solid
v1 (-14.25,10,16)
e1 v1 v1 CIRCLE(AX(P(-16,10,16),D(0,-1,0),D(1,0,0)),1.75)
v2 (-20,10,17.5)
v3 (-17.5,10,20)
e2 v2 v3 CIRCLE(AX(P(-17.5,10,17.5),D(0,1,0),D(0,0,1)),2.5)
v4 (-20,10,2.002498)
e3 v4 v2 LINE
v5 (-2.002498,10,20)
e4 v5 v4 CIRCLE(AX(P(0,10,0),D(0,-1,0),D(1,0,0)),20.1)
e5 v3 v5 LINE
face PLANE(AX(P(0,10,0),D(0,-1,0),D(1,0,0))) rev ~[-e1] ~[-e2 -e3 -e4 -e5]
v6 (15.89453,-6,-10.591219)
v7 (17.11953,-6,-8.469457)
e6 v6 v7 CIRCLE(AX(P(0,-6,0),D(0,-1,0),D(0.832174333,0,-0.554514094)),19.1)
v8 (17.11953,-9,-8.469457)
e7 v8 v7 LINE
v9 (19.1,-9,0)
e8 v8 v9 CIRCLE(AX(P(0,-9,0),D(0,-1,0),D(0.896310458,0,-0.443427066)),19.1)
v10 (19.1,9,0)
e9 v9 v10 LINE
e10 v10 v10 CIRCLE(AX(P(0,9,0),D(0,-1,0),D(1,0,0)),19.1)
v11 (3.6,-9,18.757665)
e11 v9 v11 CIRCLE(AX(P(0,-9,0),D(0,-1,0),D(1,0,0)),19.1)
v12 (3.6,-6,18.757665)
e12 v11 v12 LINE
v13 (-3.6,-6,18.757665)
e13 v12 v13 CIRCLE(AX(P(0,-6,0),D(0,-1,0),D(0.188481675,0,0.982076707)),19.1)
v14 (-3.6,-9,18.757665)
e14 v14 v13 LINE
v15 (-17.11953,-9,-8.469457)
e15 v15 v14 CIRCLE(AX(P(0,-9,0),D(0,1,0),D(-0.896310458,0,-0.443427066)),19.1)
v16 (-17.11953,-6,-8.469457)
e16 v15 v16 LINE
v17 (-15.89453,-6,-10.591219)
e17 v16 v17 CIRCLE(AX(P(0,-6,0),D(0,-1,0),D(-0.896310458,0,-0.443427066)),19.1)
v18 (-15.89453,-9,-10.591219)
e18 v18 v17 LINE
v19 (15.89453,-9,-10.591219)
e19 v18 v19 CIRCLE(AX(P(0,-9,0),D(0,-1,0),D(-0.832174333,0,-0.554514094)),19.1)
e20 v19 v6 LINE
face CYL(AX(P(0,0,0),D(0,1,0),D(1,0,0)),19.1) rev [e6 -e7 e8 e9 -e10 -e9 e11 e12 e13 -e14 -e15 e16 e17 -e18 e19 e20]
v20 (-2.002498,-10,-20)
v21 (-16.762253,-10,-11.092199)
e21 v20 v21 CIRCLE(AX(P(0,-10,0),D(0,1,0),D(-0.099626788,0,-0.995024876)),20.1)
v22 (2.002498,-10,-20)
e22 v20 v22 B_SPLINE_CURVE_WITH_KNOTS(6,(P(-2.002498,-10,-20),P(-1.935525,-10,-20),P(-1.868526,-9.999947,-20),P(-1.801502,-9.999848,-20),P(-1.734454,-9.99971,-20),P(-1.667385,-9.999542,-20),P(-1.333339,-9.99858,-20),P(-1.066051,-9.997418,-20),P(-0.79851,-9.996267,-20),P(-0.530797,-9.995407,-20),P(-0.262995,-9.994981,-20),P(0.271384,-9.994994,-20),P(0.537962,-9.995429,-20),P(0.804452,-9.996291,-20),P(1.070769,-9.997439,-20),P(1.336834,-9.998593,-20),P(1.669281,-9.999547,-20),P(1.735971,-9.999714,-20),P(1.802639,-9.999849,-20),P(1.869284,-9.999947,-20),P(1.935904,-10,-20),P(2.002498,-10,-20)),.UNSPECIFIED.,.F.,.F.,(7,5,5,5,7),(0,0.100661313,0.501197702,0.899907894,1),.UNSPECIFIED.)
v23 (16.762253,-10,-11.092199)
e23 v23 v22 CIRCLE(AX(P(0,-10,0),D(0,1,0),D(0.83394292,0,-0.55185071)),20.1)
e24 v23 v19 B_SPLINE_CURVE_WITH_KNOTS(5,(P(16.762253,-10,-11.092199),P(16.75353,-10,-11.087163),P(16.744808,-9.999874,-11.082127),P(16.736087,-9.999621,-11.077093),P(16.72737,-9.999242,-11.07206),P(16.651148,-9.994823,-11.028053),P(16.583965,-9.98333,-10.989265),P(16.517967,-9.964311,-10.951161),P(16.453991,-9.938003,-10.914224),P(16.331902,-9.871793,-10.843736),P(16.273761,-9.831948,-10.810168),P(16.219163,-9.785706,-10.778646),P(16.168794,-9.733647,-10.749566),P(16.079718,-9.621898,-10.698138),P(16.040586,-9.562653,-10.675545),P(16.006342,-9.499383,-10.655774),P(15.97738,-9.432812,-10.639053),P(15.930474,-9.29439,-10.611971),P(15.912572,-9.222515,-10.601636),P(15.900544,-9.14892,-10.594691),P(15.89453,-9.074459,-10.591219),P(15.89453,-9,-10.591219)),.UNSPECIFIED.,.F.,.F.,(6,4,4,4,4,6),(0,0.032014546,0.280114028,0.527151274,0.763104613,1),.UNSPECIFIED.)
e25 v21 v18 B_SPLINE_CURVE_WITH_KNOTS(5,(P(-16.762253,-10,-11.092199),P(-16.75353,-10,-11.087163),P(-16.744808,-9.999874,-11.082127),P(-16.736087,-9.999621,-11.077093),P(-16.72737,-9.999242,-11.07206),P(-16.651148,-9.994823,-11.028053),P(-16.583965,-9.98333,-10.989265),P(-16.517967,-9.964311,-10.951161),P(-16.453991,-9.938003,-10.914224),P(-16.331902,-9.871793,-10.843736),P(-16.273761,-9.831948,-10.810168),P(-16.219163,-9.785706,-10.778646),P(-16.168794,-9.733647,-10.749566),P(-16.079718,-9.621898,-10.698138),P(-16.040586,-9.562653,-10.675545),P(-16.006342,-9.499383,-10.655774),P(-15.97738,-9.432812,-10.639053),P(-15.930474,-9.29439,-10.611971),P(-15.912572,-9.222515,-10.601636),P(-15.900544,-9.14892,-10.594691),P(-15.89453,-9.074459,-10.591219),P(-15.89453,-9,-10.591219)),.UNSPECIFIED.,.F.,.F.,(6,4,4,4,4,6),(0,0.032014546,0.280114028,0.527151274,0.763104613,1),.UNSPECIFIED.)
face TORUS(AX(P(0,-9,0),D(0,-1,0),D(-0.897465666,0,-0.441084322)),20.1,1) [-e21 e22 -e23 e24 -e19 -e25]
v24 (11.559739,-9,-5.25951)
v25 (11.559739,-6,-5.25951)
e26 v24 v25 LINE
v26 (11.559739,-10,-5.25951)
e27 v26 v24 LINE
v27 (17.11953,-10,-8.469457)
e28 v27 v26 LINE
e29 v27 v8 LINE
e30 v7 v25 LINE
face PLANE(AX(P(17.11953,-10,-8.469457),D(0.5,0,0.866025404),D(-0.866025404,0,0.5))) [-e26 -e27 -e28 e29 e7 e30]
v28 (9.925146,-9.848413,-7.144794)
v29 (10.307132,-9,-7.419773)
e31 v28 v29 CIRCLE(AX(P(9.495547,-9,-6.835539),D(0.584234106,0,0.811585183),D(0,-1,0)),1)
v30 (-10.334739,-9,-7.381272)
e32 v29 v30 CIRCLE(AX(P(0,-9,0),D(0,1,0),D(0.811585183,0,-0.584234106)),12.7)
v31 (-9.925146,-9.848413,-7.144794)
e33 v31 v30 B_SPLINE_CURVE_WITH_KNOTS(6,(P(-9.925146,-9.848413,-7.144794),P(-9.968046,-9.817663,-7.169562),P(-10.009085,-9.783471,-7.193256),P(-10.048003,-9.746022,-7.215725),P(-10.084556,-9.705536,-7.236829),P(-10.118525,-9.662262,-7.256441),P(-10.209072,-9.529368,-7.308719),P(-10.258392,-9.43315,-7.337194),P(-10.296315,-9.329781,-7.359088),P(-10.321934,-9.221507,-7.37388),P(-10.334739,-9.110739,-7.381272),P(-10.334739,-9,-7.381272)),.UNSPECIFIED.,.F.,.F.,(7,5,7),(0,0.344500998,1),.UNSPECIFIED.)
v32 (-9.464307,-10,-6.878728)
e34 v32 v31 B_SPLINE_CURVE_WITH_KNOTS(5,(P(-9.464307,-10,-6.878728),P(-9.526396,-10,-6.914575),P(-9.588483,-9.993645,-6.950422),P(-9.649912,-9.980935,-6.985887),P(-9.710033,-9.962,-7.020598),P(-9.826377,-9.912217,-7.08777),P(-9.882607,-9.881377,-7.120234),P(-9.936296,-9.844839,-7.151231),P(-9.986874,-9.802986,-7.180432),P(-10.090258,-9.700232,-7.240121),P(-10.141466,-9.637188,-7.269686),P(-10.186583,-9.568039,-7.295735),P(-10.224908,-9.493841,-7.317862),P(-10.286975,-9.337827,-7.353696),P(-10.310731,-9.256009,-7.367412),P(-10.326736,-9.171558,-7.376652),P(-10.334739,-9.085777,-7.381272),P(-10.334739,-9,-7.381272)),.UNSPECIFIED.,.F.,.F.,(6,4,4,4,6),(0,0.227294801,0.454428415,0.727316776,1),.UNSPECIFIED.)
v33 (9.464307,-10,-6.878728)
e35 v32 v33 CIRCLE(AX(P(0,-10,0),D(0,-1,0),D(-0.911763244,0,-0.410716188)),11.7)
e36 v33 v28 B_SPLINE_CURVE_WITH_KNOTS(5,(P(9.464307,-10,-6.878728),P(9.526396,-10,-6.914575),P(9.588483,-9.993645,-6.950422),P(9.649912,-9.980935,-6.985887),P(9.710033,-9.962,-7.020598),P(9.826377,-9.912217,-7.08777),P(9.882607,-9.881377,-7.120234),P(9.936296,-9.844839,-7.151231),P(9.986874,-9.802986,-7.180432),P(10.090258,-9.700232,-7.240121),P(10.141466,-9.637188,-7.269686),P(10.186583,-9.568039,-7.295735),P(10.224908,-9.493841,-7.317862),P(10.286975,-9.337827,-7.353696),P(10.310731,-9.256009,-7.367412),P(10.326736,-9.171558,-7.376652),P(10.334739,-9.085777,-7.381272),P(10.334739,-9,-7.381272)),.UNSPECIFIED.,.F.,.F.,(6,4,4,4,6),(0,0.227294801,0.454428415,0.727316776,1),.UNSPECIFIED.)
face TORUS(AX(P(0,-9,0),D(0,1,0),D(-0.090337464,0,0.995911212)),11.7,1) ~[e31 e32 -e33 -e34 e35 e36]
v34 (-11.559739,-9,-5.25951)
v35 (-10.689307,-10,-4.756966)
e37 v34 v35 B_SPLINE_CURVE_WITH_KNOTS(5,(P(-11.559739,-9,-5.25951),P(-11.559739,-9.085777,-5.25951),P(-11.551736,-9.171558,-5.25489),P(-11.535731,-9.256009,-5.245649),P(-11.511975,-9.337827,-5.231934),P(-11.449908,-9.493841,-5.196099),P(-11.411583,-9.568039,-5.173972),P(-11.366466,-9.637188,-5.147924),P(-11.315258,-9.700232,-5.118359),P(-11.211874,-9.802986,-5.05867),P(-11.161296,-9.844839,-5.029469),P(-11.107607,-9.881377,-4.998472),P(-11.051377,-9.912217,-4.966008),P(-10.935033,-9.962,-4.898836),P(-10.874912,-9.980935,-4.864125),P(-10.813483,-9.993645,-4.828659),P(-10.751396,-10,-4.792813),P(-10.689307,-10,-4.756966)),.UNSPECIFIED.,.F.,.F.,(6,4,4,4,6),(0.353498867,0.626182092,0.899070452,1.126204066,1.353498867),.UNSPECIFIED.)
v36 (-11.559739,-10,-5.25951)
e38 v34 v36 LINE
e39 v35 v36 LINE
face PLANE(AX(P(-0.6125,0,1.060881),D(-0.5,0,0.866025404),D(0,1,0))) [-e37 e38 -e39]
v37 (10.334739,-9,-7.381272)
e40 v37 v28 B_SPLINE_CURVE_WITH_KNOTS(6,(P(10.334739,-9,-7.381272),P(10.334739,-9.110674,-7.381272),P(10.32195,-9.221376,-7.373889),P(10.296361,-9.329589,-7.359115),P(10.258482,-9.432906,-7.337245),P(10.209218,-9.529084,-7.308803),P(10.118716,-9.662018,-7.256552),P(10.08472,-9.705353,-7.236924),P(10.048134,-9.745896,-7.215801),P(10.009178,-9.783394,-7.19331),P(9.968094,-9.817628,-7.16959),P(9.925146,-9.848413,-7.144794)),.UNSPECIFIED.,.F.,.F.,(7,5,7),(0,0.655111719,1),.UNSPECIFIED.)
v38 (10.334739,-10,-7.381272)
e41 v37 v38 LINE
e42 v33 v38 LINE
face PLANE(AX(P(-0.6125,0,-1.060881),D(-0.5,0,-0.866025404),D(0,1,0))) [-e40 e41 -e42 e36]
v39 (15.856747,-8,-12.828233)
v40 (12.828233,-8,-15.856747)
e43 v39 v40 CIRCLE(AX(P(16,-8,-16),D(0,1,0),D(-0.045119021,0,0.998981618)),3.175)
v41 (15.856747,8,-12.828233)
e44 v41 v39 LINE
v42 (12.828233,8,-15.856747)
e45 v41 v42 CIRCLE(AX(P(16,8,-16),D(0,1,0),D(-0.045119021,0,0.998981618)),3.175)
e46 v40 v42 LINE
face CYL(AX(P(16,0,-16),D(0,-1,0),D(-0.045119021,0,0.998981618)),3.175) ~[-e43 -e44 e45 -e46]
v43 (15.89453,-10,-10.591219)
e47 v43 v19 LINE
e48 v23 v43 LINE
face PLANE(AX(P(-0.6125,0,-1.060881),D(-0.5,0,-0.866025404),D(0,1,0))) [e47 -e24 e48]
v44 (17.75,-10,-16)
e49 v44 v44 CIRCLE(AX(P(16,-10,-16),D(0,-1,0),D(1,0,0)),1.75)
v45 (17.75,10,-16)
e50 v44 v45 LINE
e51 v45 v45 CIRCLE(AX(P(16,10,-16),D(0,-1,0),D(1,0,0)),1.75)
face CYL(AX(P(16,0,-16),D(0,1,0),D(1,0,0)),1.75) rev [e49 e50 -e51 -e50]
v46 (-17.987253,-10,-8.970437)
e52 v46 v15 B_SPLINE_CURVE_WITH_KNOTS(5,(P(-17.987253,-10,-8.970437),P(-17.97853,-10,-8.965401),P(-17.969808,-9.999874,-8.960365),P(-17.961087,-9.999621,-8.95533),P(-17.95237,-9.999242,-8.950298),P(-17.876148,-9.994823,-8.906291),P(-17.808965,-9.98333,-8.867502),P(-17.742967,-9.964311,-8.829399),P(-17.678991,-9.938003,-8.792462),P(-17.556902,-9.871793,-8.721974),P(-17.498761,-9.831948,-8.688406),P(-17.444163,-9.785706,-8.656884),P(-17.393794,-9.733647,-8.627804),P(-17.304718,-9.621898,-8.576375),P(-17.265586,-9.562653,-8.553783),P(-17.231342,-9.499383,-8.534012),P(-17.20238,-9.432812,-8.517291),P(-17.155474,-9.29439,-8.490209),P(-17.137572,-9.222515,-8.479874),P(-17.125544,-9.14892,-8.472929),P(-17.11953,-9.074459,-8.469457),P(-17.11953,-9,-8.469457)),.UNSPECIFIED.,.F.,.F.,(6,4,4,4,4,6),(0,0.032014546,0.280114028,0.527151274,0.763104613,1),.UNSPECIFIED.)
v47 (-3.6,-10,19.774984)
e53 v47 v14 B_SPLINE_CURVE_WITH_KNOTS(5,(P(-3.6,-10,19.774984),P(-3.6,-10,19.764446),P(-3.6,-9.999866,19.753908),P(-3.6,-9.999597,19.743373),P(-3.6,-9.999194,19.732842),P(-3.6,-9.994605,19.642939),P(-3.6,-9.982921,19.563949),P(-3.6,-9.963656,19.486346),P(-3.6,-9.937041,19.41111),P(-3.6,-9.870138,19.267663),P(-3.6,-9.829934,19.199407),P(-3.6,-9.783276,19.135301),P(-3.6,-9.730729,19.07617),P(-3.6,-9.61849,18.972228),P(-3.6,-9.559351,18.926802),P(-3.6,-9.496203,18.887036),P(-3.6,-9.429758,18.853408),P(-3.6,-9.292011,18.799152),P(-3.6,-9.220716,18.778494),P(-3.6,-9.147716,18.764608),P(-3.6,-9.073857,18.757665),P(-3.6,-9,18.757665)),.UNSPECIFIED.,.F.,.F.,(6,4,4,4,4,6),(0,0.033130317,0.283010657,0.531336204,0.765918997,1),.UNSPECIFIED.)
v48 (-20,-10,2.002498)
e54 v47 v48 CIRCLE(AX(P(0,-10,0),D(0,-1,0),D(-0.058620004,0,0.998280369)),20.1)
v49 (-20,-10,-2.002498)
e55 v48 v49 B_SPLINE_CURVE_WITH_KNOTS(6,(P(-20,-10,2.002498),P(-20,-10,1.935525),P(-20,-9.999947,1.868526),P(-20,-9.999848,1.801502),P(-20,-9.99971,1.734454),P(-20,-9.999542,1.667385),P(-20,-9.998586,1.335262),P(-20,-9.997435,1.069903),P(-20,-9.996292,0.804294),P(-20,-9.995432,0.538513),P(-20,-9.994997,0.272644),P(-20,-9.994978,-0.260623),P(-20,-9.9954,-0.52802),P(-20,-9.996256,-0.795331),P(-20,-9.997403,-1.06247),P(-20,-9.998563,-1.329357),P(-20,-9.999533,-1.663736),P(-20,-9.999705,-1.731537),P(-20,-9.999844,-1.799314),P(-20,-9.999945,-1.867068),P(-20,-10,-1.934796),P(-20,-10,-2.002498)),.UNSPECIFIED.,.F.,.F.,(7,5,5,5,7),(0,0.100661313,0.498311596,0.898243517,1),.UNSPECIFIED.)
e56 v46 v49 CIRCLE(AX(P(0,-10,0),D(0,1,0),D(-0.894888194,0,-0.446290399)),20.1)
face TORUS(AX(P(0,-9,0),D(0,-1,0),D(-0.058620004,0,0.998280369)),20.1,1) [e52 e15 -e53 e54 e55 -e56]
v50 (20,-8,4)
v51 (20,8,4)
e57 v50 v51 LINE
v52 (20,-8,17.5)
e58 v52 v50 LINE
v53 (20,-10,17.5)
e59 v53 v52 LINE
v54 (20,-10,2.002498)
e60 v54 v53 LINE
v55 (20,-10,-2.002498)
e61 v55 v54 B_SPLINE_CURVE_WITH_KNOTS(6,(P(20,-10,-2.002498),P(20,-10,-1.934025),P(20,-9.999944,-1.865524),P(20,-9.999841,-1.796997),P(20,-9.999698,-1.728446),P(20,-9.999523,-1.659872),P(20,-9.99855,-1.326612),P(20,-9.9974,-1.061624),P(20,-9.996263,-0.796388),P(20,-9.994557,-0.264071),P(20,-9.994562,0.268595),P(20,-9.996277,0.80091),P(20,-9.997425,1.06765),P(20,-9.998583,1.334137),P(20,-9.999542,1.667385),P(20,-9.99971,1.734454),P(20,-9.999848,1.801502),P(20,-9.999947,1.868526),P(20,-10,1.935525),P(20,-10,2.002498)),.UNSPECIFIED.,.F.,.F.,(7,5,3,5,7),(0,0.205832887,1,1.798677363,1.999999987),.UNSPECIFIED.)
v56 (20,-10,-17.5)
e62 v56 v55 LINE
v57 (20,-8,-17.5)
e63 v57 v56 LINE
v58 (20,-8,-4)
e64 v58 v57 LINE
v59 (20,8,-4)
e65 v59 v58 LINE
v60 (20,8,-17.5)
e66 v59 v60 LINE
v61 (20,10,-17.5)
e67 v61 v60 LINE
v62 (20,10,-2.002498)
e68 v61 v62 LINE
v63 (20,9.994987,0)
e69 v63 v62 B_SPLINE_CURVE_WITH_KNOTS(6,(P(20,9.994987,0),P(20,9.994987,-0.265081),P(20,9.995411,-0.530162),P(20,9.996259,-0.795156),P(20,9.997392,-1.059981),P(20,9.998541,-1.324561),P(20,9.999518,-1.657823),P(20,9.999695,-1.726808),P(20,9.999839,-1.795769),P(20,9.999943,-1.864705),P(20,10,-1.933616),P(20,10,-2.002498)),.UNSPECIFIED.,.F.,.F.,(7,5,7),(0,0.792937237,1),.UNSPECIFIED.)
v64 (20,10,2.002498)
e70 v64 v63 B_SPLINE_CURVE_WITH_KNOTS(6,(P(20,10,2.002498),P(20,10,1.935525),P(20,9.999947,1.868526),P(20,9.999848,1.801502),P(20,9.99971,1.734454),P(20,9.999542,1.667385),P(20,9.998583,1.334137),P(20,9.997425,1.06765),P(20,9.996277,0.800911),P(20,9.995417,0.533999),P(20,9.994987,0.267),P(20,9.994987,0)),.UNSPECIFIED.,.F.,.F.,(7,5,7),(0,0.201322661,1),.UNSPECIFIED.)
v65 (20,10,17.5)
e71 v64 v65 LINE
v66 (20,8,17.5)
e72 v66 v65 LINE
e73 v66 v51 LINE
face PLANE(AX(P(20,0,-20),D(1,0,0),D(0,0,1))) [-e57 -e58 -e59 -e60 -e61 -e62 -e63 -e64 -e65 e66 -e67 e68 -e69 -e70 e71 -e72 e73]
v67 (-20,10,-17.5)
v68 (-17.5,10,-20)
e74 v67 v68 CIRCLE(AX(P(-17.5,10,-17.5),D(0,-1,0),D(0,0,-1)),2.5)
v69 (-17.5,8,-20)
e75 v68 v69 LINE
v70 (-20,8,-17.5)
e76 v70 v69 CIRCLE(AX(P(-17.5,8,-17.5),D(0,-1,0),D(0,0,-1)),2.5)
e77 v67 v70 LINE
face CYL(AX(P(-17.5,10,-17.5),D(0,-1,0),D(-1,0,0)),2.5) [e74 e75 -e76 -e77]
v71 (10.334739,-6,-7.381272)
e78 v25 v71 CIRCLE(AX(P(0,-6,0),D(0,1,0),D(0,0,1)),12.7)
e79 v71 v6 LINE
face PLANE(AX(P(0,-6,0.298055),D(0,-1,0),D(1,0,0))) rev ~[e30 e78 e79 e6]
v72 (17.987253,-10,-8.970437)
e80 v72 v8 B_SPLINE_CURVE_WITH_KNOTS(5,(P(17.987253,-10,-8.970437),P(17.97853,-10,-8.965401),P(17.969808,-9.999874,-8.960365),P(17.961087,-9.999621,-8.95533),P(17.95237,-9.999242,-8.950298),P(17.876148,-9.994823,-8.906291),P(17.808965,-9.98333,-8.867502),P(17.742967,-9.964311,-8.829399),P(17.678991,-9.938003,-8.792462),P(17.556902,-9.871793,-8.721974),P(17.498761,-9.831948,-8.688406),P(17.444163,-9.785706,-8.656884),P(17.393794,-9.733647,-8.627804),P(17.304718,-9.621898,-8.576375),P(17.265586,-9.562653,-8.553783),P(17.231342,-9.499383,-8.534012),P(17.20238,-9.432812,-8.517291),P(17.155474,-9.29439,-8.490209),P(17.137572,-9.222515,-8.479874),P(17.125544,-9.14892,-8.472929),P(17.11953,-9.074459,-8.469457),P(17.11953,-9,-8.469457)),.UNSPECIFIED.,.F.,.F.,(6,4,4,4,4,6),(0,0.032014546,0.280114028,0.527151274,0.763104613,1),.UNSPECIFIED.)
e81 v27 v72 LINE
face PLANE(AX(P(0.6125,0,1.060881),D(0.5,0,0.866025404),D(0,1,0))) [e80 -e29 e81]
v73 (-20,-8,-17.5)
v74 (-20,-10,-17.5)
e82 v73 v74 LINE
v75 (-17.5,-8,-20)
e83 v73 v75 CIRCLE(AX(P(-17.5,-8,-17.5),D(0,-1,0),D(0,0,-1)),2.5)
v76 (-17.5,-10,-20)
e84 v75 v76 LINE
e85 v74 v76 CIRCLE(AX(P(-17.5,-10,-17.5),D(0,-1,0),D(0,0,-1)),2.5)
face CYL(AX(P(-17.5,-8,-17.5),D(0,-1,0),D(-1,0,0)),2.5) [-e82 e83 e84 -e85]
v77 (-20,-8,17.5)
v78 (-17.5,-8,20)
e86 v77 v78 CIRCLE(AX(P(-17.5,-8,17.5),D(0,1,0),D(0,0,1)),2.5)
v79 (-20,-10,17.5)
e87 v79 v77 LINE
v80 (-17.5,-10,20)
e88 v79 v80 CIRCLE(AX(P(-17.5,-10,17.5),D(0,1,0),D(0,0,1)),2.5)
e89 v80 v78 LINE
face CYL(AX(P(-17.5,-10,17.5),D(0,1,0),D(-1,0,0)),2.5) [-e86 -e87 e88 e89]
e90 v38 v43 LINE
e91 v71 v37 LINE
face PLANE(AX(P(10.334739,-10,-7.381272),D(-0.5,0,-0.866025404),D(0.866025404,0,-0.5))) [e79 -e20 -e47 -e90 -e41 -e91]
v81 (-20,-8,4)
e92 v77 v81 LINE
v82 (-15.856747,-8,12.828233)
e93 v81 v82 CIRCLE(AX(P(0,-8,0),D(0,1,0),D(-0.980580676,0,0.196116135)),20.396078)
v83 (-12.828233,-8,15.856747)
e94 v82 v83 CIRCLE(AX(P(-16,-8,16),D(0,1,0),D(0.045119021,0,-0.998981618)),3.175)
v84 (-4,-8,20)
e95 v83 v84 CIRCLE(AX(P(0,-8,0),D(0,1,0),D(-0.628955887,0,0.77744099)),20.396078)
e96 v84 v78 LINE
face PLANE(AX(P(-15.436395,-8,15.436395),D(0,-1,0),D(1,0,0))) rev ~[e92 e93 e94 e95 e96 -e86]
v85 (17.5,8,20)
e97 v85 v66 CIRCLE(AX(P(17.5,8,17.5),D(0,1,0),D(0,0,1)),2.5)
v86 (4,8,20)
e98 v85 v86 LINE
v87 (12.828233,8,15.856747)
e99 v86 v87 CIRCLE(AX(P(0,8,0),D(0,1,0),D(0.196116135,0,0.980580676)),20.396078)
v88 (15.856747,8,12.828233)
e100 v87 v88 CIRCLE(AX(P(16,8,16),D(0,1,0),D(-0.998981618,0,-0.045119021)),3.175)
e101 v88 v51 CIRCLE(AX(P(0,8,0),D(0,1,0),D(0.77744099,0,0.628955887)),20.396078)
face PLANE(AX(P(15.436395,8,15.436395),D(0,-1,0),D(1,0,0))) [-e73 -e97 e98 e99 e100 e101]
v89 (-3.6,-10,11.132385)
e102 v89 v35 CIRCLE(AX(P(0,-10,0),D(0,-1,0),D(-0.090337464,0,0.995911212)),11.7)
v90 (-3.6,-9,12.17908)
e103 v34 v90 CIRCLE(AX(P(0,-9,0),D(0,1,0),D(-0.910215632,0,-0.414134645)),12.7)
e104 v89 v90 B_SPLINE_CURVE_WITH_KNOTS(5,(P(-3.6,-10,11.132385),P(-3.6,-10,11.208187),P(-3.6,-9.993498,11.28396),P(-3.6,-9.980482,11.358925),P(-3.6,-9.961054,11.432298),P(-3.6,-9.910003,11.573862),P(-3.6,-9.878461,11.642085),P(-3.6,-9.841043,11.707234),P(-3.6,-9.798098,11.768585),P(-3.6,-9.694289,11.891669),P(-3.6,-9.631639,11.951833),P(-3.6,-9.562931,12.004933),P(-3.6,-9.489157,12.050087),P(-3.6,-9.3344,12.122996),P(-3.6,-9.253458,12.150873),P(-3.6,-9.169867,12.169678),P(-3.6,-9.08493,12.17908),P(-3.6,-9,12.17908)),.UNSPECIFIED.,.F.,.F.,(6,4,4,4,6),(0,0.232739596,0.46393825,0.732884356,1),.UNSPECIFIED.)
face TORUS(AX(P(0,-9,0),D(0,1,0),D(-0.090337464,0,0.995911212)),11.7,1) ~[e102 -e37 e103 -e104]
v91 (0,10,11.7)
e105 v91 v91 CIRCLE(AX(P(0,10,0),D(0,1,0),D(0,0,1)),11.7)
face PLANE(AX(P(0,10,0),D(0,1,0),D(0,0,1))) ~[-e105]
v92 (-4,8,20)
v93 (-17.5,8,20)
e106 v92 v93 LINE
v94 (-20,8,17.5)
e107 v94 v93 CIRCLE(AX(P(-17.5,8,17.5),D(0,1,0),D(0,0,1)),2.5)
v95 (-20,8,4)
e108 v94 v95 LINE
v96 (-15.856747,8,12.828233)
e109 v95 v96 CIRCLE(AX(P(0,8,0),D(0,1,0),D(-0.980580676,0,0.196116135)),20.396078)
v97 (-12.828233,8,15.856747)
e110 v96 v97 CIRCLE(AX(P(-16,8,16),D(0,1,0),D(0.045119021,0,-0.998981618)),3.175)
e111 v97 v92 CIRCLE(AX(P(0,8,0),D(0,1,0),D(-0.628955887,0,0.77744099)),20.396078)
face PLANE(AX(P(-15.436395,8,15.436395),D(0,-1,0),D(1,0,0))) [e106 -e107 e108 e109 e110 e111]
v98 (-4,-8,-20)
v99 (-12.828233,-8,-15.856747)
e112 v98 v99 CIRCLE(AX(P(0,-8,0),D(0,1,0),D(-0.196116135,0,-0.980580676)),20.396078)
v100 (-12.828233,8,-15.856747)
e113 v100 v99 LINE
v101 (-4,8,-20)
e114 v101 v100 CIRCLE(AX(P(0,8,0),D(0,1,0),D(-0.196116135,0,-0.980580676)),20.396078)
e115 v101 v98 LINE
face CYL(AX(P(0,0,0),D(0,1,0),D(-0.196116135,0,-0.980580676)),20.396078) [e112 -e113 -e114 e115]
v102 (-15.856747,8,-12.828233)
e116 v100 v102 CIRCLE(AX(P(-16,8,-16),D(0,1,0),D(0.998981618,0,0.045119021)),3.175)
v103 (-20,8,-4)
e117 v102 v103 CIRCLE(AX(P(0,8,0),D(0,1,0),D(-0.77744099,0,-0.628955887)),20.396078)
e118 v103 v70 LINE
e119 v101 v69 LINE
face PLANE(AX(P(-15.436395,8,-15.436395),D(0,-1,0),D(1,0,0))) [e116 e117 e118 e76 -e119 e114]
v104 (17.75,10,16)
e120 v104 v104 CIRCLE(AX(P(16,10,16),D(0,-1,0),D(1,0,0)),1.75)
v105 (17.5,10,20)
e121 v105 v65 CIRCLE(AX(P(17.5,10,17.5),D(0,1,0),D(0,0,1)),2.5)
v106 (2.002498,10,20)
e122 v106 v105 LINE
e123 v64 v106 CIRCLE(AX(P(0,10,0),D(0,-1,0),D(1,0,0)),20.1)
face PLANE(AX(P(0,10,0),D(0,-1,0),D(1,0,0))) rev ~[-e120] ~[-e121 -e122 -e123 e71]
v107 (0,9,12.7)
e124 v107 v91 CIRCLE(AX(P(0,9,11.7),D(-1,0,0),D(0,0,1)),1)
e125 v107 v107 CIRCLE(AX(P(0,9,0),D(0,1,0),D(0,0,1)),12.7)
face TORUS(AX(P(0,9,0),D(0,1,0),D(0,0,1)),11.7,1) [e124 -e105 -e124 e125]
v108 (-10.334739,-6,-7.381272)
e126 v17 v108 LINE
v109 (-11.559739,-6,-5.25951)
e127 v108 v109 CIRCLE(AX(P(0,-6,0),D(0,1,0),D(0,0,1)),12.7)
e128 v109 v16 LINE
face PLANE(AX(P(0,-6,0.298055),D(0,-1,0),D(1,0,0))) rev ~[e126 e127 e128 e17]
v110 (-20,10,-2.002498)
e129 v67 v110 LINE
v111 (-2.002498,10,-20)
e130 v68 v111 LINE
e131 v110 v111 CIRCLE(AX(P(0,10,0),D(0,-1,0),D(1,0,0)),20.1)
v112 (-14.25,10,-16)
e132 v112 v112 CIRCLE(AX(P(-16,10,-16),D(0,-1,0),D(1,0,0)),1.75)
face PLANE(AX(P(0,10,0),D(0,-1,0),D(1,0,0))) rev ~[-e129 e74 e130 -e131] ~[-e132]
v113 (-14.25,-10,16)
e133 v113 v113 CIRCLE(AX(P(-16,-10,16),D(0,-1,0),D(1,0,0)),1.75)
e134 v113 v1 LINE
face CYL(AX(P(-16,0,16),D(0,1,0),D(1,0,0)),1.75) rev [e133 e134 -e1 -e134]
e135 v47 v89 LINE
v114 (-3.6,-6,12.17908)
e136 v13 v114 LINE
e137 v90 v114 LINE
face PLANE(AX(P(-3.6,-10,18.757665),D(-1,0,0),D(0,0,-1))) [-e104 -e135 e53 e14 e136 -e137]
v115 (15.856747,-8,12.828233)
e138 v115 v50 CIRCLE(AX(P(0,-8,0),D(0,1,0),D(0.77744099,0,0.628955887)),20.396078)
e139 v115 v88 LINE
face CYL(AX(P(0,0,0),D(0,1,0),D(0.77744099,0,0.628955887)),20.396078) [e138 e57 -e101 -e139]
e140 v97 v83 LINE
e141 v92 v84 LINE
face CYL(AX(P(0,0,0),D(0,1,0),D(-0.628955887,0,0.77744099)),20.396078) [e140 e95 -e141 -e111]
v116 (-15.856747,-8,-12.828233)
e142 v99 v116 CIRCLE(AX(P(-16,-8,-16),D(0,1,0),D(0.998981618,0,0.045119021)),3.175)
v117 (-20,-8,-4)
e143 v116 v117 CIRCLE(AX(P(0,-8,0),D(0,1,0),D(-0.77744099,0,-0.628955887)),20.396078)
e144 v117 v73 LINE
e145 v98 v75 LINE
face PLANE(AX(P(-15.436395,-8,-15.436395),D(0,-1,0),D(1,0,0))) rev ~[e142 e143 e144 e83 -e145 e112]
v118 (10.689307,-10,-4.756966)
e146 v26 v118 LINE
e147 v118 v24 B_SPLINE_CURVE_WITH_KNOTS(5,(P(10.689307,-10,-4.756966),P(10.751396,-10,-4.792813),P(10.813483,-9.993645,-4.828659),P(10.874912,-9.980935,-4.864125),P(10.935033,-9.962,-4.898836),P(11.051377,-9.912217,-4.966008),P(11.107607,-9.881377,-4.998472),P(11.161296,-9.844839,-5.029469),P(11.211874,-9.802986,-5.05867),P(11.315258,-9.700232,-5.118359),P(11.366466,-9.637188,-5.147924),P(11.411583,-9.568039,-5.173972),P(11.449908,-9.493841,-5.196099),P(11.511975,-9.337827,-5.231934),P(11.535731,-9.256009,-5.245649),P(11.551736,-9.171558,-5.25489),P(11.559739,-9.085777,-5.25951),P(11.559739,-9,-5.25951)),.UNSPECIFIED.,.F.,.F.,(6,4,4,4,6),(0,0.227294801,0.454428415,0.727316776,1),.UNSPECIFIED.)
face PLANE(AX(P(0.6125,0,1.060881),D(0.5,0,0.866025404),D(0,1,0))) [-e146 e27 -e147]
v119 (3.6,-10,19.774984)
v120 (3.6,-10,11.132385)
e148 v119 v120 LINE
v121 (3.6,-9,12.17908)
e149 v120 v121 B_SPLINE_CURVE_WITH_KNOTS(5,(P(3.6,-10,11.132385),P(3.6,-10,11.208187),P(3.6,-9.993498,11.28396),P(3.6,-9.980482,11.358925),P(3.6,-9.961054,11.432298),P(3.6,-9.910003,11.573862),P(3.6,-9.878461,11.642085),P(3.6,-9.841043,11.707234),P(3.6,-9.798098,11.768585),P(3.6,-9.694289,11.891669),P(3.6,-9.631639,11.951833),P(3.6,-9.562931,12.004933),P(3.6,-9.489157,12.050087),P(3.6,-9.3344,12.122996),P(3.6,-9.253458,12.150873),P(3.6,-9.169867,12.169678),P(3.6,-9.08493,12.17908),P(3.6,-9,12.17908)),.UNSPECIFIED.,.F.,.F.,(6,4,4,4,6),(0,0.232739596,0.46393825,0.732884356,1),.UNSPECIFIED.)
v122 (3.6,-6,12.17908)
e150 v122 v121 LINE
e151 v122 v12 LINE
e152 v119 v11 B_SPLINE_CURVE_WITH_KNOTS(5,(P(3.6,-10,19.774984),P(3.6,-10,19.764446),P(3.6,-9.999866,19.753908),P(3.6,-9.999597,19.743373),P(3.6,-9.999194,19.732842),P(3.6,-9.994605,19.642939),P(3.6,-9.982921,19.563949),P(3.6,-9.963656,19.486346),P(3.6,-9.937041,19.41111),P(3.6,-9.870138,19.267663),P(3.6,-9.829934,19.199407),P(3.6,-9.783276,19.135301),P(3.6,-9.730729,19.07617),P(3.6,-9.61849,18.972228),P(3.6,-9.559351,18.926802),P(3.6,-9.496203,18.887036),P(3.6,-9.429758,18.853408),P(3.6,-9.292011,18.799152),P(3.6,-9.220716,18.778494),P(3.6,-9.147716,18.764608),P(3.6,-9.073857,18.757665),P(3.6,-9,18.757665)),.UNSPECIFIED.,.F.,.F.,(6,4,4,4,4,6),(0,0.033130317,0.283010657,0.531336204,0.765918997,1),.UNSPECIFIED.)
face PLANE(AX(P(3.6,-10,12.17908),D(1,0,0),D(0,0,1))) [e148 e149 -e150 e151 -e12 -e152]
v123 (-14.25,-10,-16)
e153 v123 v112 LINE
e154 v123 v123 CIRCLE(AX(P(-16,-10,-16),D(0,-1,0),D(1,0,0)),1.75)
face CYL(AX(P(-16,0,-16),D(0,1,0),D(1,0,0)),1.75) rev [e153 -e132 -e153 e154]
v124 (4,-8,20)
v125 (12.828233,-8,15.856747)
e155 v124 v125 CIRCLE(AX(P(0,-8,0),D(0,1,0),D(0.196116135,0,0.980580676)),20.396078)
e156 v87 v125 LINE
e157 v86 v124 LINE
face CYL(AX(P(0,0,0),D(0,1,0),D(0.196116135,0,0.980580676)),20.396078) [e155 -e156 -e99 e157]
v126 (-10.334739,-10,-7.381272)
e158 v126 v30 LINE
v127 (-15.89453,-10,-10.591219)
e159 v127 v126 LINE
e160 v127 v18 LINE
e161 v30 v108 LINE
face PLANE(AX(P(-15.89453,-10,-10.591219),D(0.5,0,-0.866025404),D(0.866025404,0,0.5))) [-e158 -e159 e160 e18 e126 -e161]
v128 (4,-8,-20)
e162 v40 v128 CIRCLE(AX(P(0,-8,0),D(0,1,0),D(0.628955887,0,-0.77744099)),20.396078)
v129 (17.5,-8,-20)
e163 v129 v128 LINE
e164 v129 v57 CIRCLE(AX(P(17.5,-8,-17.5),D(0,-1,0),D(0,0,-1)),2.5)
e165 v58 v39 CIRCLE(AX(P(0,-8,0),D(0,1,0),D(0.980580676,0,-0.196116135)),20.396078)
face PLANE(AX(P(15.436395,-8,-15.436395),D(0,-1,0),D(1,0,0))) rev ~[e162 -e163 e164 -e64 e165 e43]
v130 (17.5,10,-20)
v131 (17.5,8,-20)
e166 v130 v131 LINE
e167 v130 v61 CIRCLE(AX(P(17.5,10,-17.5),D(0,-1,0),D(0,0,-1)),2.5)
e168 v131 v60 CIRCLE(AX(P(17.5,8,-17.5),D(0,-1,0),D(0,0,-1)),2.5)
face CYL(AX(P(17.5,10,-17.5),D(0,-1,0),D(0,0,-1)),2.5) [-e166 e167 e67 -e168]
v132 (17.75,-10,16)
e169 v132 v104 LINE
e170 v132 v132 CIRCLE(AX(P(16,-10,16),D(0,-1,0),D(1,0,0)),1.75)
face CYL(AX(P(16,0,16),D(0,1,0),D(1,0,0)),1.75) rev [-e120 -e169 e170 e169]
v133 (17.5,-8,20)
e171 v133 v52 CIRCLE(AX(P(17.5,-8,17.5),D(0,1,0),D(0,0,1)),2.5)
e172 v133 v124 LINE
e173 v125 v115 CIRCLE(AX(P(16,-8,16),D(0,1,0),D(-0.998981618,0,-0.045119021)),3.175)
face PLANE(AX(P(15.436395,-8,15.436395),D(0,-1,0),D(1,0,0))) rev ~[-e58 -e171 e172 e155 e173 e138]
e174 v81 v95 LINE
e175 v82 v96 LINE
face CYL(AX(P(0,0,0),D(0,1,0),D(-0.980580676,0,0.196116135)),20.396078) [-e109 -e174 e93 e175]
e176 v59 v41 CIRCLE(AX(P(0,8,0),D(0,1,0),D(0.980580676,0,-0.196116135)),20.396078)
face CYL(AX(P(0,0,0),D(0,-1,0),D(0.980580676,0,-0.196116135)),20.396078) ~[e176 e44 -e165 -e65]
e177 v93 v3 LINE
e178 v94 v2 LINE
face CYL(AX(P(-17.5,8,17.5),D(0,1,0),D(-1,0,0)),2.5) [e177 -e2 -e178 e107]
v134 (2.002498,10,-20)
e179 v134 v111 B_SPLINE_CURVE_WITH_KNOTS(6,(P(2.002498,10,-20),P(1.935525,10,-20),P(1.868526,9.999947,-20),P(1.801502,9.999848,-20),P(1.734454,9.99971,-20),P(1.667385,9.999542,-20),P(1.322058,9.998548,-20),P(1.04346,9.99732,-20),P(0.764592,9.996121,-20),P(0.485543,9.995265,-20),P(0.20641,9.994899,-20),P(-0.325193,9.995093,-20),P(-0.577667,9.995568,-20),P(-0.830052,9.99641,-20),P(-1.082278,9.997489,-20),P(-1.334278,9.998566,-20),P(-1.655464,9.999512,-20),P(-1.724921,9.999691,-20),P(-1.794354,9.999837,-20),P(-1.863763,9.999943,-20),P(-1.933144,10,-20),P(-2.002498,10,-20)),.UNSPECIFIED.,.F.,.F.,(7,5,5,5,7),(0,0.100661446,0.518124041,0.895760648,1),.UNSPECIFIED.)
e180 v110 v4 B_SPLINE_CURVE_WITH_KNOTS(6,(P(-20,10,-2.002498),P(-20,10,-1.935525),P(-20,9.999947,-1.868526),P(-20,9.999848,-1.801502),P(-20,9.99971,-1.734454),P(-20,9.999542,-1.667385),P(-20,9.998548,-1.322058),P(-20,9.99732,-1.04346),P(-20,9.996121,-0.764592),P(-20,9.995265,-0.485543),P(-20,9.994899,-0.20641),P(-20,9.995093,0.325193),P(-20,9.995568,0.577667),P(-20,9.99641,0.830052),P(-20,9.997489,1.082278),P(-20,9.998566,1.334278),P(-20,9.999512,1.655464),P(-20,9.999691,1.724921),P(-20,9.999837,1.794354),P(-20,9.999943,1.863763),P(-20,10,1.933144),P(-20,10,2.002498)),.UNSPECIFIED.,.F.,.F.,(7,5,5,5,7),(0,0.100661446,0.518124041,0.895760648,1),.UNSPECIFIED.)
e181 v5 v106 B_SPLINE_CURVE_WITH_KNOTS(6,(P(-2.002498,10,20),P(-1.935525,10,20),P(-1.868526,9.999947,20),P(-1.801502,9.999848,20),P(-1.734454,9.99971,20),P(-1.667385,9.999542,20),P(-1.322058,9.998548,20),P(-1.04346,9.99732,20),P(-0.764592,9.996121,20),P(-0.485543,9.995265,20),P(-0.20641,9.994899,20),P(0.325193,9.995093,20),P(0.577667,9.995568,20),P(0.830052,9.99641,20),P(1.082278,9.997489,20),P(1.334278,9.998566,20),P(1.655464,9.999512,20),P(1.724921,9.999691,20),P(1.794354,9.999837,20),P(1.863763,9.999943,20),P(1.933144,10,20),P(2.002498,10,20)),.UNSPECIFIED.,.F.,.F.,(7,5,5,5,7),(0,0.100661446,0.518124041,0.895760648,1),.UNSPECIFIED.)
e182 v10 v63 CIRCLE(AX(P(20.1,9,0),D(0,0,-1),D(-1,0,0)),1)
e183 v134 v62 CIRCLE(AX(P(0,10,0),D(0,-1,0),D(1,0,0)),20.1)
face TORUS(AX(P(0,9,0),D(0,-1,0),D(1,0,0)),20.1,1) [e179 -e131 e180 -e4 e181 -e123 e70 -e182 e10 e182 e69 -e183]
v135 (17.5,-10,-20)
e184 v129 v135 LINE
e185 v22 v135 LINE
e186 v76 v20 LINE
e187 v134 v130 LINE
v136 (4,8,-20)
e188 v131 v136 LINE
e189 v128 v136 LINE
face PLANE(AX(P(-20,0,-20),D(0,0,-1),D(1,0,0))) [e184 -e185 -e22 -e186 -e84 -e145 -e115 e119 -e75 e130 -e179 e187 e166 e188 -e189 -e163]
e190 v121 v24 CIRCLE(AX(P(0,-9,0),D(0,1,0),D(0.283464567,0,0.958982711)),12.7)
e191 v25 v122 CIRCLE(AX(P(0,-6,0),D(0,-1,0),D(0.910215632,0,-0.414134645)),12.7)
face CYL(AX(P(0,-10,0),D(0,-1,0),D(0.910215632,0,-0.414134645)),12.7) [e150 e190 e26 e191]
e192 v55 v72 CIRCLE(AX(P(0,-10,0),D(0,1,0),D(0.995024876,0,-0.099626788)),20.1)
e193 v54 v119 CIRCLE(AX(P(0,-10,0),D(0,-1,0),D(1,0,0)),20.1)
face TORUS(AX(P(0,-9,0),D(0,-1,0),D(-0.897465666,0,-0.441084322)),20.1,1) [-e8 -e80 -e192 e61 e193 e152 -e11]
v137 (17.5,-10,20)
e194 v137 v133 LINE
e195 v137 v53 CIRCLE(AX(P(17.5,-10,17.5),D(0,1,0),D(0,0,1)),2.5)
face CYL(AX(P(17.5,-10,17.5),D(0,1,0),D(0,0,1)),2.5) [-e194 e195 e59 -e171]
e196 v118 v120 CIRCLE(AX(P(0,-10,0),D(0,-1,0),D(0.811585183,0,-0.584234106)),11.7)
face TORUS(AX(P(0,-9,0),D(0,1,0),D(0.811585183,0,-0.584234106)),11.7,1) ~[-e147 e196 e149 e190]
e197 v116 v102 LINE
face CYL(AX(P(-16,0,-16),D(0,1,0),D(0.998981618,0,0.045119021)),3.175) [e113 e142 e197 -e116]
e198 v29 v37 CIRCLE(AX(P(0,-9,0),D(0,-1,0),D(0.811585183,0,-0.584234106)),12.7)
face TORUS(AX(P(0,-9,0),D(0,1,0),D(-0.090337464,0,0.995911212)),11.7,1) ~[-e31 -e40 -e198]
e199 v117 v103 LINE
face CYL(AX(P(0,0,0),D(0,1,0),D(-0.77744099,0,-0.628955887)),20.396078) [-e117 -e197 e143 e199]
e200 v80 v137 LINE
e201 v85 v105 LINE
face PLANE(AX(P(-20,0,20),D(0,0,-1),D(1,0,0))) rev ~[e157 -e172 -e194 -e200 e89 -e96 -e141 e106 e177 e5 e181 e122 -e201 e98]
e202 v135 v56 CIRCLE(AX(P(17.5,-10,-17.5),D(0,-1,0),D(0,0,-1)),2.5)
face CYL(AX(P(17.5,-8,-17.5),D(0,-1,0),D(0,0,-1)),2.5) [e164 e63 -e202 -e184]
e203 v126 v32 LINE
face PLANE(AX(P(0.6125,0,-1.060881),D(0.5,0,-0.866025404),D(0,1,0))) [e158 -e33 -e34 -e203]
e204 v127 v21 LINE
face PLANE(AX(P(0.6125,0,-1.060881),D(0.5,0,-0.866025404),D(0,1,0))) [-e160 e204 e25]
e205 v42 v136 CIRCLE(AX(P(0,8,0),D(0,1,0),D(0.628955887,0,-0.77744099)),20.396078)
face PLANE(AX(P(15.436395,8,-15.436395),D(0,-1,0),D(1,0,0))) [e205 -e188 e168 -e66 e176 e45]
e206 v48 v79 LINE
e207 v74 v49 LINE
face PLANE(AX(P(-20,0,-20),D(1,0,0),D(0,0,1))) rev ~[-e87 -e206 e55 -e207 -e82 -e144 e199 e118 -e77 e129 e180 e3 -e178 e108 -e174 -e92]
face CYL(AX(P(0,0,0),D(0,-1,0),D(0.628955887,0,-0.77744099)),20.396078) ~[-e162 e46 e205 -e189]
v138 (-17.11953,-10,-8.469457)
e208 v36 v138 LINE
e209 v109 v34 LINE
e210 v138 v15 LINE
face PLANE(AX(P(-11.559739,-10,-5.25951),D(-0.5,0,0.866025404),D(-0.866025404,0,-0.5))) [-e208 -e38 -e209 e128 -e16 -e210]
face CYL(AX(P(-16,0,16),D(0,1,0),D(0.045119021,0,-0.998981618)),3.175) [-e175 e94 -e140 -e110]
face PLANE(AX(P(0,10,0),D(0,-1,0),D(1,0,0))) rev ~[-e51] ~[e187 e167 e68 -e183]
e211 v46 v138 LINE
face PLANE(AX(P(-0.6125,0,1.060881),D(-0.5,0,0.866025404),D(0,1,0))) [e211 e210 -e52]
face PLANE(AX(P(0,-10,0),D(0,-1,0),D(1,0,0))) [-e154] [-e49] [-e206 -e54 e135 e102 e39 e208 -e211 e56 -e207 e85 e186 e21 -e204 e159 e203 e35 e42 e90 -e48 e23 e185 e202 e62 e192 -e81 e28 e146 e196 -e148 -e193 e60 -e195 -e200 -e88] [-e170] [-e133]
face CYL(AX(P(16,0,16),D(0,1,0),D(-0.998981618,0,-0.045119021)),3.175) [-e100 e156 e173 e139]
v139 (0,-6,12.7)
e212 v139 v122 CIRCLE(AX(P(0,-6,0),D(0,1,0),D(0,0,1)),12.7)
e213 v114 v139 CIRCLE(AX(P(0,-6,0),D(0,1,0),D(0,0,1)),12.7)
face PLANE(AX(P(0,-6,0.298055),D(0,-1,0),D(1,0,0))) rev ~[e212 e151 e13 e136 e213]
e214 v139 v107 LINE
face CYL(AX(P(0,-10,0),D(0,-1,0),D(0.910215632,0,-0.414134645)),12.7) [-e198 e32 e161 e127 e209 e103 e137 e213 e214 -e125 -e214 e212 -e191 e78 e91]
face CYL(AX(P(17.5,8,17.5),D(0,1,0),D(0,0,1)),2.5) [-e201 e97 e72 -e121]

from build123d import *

# Parameters (mm, degrees)
F0_W         = 40
F0_H         = 40
F0_R         = 1.75
F0_R_2       = 19.1
F1_DEPTH     = 10
F3_DEPTH     = 8
F4_R         = 2.5
F6_DEPTH     = 4
F7_W         = 18
F7_H         = 12.7
F9_T6_ANGLE  = 120.5658801398
F9_T11_ANGLE = 120.5658801398
F9_T17_ANGLE = 120.5658801398
F9_T23_ANGLE = 120.5658801398
F9_T28_ANGLE = 131.5003349081
F9_T33_ANGLE = 131.5003349081
F9_T39_ANGLE = 131.5003349081
F9_T44_ANGLE = 120.4657257073
F9_T50_ANGLE = 120.4657257073
F9_T55_ANGLE = 86.6375868427
F9_T60_ANGLE = 127.6538287978
F9_T65_ANGLE = 127.6538287978
F9_T71_ANGLE = 127.6538287978
F9_T78_ANGLE = 33.8224519286
F9_T83_ANGLE = 33.8224519286


# Not quite as in the source:
# - a fillet or chamfer that OpenCascade refuses, or shapes differently, is made with other operations: its cross-section is extruded or revolved along the edge and cut away or added


with BuildPart() as f1:
    # F0 (on Front) → F1 (new body, symmetric)
    with BuildSketch(Plane.XZ):
        Rectangle(F0_W, F0_H)
        with Locations((-16, -16)):
            Circle(F0_R, mode=Mode.SUBTRACT)
        with Locations((16, -16)):
            Circle(F0_R, mode=Mode.SUBTRACT)
        with Locations((-16, 16)):
            Circle(F0_R, mode=Mode.SUBTRACT)
        Circle(F0_R_2, mode=Mode.SUBTRACT)
        with Locations((16, 16)):
            Circle(F0_R, mode=Mode.SUBTRACT)
    extrude(amount=F1_DEPTH, both=True)

    # F2 (on Front) → F3 (cut, symmetric)
    with BuildSketch(Plane.XZ):
        with BuildLine():
            ThreePointArc((-15.8567471072, 12.8282333616), (-18.2450640303, 18.2450640303), (-12.8282333616, 15.8567471072))
            ThreePointArc((-12.8282333616, 15.8567471072), (-8.6653906808, 18.463775463), (-4, 20))
            Line((-4, 20), (-4, 20.3960780544))
            Line((-4, 20.3960780544), (-20.3960780544, 20.3960780544))
            Line((-20.3960780544, 20.3960780544), (-20.3960780544, 4))
            Line((-20.3960780544, 4), (-20, 4))
            ThreePointArc((-20, 4), (-18.463775463, 8.6653906808), (-15.8567471072, 12.8282333616))
        make_face()
        with BuildLine():
            Line((20.3960780544, 4), (20.3960780544, 20.3960780544))
            Line((20.3960780544, 20.3960780544), (4, 20.3960780544))
            Line((4, 20.3960780544), (4, 20))
            ThreePointArc((4, 20), (8.6653906808, 18.463775463), (12.8282333616, 15.8567471072))
            ThreePointArc((12.8282333616, 15.8567471072), (18.2450640303, 18.2450640303), (15.8567471072, 12.8282333616))
            ThreePointArc((15.8567471072, 12.8282333616), (18.463775463, 8.6653906808), (20, 4))
            Line((20, 4), (20.3960780544, 4))
        make_face()
        with BuildLine():
            Line((-20.3960780544, -4), (-20.3960780544, -20.3960780544))
            Line((-20.3960780544, -20.3960780544), (-4, -20.3960780544))
            Line((-4, -20.3960780544), (-4, -20))
            ThreePointArc((-4, -20), (-8.6653906808, -18.463775463), (-12.8282333616, -15.8567471072))
            ThreePointArc((-12.8282333616, -15.8567471072), (-18.2450640303, -18.2450640303), (-15.8567471072, -12.8282333616))
            ThreePointArc((-15.8567471072, -12.8282333616), (-18.463775463, -8.6653906808), (-20, -4))
            Line((-20, -4), (-20.3960780544, -4))
        make_face()
        with BuildLine():
            Line((4, -20.3960780544), (20.3960780544, -20.3960780544))
            Line((20.3960780544, -20.3960780544), (20.3960780544, -4))
            Line((20.3960780544, -4), (20, -4))
            ThreePointArc((20, -4), (18.463775463, -8.6653906808), (15.8567471072, -12.8282333616))
            ThreePointArc((15.8567471072, -12.8282333616), (18.2450640303, -18.2450640303), (12.8282333616, -15.8567471072))
            ThreePointArc((12.8282333616, -15.8567471072), (8.6653906808, -18.463775463), (4, -20))
            Line((4, -20), (4, -20.3960780544))
        make_face()
    extrude(amount=F3_DEPTH, both=True, mode=Mode.SUBTRACT)

    # F4
    f4_edges = [f1.edges().sort_by_distance(p)[0] for p in [
        (20, -9, 20),
        (20, 9, 20),
        (20, -9, -20),
        (20, 9, -20),
        (-20, -9, 20),
        (-20, 9, 20),
        (-20, 9, -20),
        (-20, -9, -20),
    ]]
    fillet(f4_edges, radius=F4_R)

    # F5 (on face) → F6 (join)
    with BuildSketch(Plane.XZ.offset(10)):
        with BuildLine():
            Line((-3.6, 18.7576650999), (-3.6, 12.1790804251))
            ThreePointArc((-3.6, 12.1790804251), (-11.5533772944, 5.2734687913), (-11.5597385217, -5.2595099877))
            Line((-11.5597385217, -5.2595099877), (-17.1195297525, -8.4694569515))
            ThreePointArc((-17.1195297525, -8.4694569515), (-16.5410852123, -9.55), (-15.8945297525, -10.5912191908))
            Line((-15.8945297525, -10.5912191908), (-10.3347385217, -7.381272227))
            ThreePointArc((-10.3347385217, -7.381272227), (0, -12.7), (10.3347385217, -7.381272227))
            Line((10.3347385217, -7.381272227), (15.8945297525, -10.5912191908))
            ThreePointArc((15.8945297525, -10.5912191908), (16.5410852123, -9.55), (17.1195297525, -8.4694569515))
            Line((17.1195297525, -8.4694569515), (11.5597385217, -5.2595099877))
            ThreePointArc((11.5597385217, -5.2595099877), (11.5533772944, 5.2734687913), (3.6, 12.1790804251))
            Line((3.6, 12.1790804251), (3.6, 18.7576650999))
            ThreePointArc((3.6, 18.7576650999), (0, 19.1), (-3.6, 18.7576650999))
        make_face()
    extrude(amount=-F6_DEPTH)

    # F7 (on Right) → F8 (revolve)
    with BuildSketch(Plane.YZ):
        with Locations((1, 6.35)):
            Rectangle(F7_W, F7_H)
    revolve(axis=Axis((0, 1.2222109362, 0), (0, 1, 0)))

    # F9: fillet of radius 1 on 9 edges, made by hand

    # F9_s1 → F9_t2 (revolve, cut)
    with BuildSketch(Plane.YZ):
        with BuildLine():
            ThreePointArc((9, 12.7), (9.7071067812, 12.4071067812), (10, 11.7))
            Line((10, 11.7), (10, 12.7))
            Line((10, 12.7), (9, 12.7))
        make_face()
    revolve(axis=Axis((0, 10, 0), (0, 1, 0)), mode=Mode.SUBTRACT)


with BuildPart() as f9_tool4:
    # F9_s5 → F9_t6 (revolve)
    with BuildSketch(Plane(origin=(0, 0, 0), x_dir=(0, 1, 0), z_dir=(-0.5842341064, 0, -0.8115851828))):
        with BuildLine():
            ThreePointArc((-10, 11.7), (-9.7071067812, 12.4071067812), (-9, 12.7))
            Line((-9, 12.7), (-10, 12.7))
            Line((-10, 12.7), (-10, 11.7))
        make_face()
    revolve(axis=Axis((0, -10, 0), (0, -1, 0)), revolution_arc=F9_T6_ANGLE)

    split(bisect_by=Plane(origin=(-0.6125, 0, -1.0608811196), x_dir=(0, 1, 0), z_dir=(-0.5, 0, -0.8660254038)), keep=Keep.TOP)


with BuildPart() as f1_1:
    add(f1.part)

    # F9_t3: cut F9_tool4
    add(f9_tool4.part, mode=Mode.SUBTRACT)


with BuildPart() as f9_tool9:
    # F9_s10 → F9_t11 (revolve)
    with BuildSketch(Plane(origin=(0, 0, 0), x_dir=(0, 1, 0), z_dir=(-0.5842341064, 0, -0.8115851828))):
        with BuildLine():
            ThreePointArc((-10, 11.7), (-9.7071067812, 12.4071067812), (-9, 12.7))
            Line((-9, 12.7), (-10, 12.7))
            Line((-10, 12.7), (-10, 11.7))
        make_face()
    revolve(axis=Axis((0, -10, 0), (0, -1, 0)), revolution_arc=F9_T11_ANGLE)

    split(bisect_by=Plane.YZ.offset(3.6), keep=Keep.TOP)

    split(bisect_by=Plane(origin=(0.6125, 0, 1.0608811196), x_dir=(0, 1, 0), z_dir=(0.5, 0, 0.8660254038)), keep=Keep.TOP)


with BuildPart() as f1_2:
    add(f1_1.part)

    # F9_t8: cut F9_tool9
    add(f9_tool9.part, mode=Mode.SUBTRACT)


with BuildPart() as f9_tool15:
    # F9_s16 → F9_t17 (revolve)
    with BuildSketch(Plane(origin=(0, 0, 0), x_dir=(0, 1, 0), z_dir=(0.9959112122, 0, 0.0903374635))):
        with BuildLine():
            ThreePointArc((-10, 11.7), (-9.7071067812, 12.4071067812), (-9, 12.7))
            Line((-9, 12.7), (-10, 12.7))
            Line((-10, 12.7), (-10, 11.7))
        make_face()
    revolve(axis=Axis((0, -10, 0), (0, -1, 0)), revolution_arc=F9_T17_ANGLE)

    split(bisect_by=Plane(origin=(-0.6125, 0, 1.0608811196), x_dir=(0, 1, 0), z_dir=(-0.5, 0, 0.8660254038)), keep=Keep.TOP)

    split(bisect_by=Plane.YZ.offset(-3.6), keep=Keep.BOTTOM)


with BuildPart() as f1_3:
    add(f1_2.part)

    # F9_t14: cut F9_tool15
    add(f9_tool15.part, mode=Mode.SUBTRACT)


with BuildPart() as f9_tool21:
    # F9_s22 → F9_t23 (revolve)
    with BuildSketch(Plane(origin=(0, 0, 0), x_dir=(0, 1, 0), z_dir=(0.9959112122, 0, 0.0903374635))):
        with BuildLine():
            ThreePointArc((-10, 11.7), (-9.7071067812, 12.4071067812), (-9, 12.7))
            Line((-9, 12.7), (-10, 12.7))
            Line((-10, 12.7), (-10, 11.7))
        make_face()
    revolve(axis=Axis((0, -10, 0), (0, -1, 0)), revolution_arc=F9_T23_ANGLE)

    split(bisect_by=Plane(origin=(0.6125, 0, -1.0608811196), x_dir=(0, 1, 0), z_dir=(0.5, 0, -0.8660254038)), keep=Keep.TOP)


with BuildPart() as f1_4:
    add(f1_3.part)

    # F9_t20: cut F9_tool21
    add(f9_tool21.part, mode=Mode.SUBTRACT)


with BuildPart() as f9_tool26:
    # F9_s27 → F9_t28 (revolve)
    with BuildSketch(Plane(origin=(0, 0, 0), x_dir=(0, 1, 0), z_dir=(-0.4107161879, 0, 0.911763244))):
        with BuildLine():
            ThreePointArc((-10, 11.7), (-9.7071067812, 12.4071067812), (-9, 12.7))
            Line((-9, 12.7), (-10, 12.7))
            Line((-10, 12.7), (-10, 11.7))
        make_face()
    revolve(axis=Axis((0, -10, 0), (0, -1, 0)), revolution_arc=F9_T28_ANGLE)

    split(bisect_by=Plane(origin=(-0.6125, 0, 1.0608811196), x_dir=(0, 1, 0), z_dir=(-0.5, 0, 0.8660254038)), keep=Keep.TOP)


with BuildPart() as f1_5:
    add(f1_4.part)

    # F9_t25: cut F9_tool26
    add(f9_tool26.part, mode=Mode.SUBTRACT)


with BuildPart() as f9_tool31:
    # F9_s32 → F9_t33 (revolve)
    with BuildSketch(Plane(origin=(0, 0, 0), x_dir=(0, 1, 0), z_dir=(-0.4107161879, 0, 0.911763244))):
        with BuildLine():
            ThreePointArc((-10, 11.7), (-9.7071067812, 12.4071067812), (-9, 12.7))
            Line((-9, 12.7), (-10, 12.7))
            Line((-10, 12.7), (-10, 11.7))
        make_face()
    revolve(axis=Axis((0, -10, 0), (0, -1, 0)), revolution_arc=F9_T33_ANGLE)

    split(bisect_by=Plane(origin=(-0.6125, 0, -1.0608811196), x_dir=(0, 1, 0), z_dir=(-0.5, 0, -0.8660254038)), keep=Keep.TOP)

    split(bisect_by=Plane(origin=(0.6125, 0, -1.0608811196), x_dir=(0, 1, 0), z_dir=(0.5, 0, -0.8660254038)), keep=Keep.TOP)


with BuildPart() as f1_6:
    add(f1_5.part)

    # F9_t30: cut F9_tool31
    add(f9_tool31.part, mode=Mode.SUBTRACT)


with BuildPart() as f9_tool37:
    # F9_s38 → F9_t39 (revolve)
    with BuildSketch(Plane(origin=(0, 0, 0), x_dir=(0, 1, 0), z_dir=(-0.4107161879, 0, 0.911763244))):
        with BuildLine():
            ThreePointArc((-10, 11.7), (-9.7071067812, 12.4071067812), (-9, 12.7))
            Line((-9, 12.7), (-10, 12.7))
            Line((-10, 12.7), (-10, 11.7))
        make_face()
    revolve(axis=Axis((0, -10, 0), (0, -1, 0)), revolution_arc=F9_T39_ANGLE)

    split(bisect_by=Plane(origin=(0.6125, 0, 1.0608811196), x_dir=(0, 1, 0), z_dir=(0.5, 0, 0.8660254038)), keep=Keep.TOP)


with BuildPart() as f1_7:
    add(f1_6.part)

    # F9_t36: cut F9_tool37
    add(f9_tool37.part, mode=Mode.SUBTRACT)


with BuildPart() as f9_tool42:
    # F9_s43 → F9_t44 (revolve)
    with BuildSketch(Plane(origin=(0, 0, 0), x_dir=(0, 1, 0), z_dir=(0.998280369, 0, 0.0586200041))):
        with BuildLine():
            ThreePointArc((-10, 20.1), (-9.7071067812, 19.3928932188), (-9, 19.1))
            Line((-9, 19.1), (-10, 19.1))
            Line((-10, 19.1), (-10, 20.1))
        make_face()
    revolve(axis=Axis((0, -10, 0), (0, -1, 0)), revolution_arc=F9_T44_ANGLE)

    split(bisect_by=Plane(origin=(-0.6125, 0, 1.0608811196), x_dir=(0, 1, 0), z_dir=(-0.5, 0, 0.8660254038)), keep=Keep.TOP)

    split(bisect_by=Plane.YZ.offset(-3.6), keep=Keep.BOTTOM)


with BuildPart() as f1_8:
    add(f1_7.part)

    # F9_t41: cut F9_tool42
    add(f9_tool42.part, mode=Mode.SUBTRACT)


with BuildPart() as f9_tool48:
    # F9_s49 → F9_t50 (revolve)
    with BuildSketch(Plane(origin=(0, 0, 0), x_dir=(0, 1, 0), z_dir=(0.998280369, 0, 0.0586200041))):
        with BuildLine():
            ThreePointArc((-10, 20.1), (-9.7071067812, 19.3928932188), (-9, 19.1))
            Line((-9, 19.1), (-10, 19.1))
            Line((-10, 19.1), (-10, 20.1))
        make_face()
    revolve(axis=Axis((0, -10, 0), (0, -1, 0)), revolution_arc=F9_T50_ANGLE)

    split(bisect_by=Plane(origin=(0.6125, 0, -1.0608811196), x_dir=(0, 1, 0), z_dir=(0.5, 0, -0.8660254038)), keep=Keep.TOP)


with BuildPart() as f1_9:
    add(f1_8.part)

    # F9_t47: cut F9_tool48
    add(f9_tool48.part, mode=Mode.SUBTRACT)


with BuildPart() as f9_tool53:
    # F9_s54 → F9_t55 (revolve)
    with BuildSketch(Plane.XY):
        with BuildLine():
            ThreePointArc((20.1, -10), (19.3928932188, -9.7071067812), (19.1, -9))
            Line((19.1, -9), (19.1, -10))
            Line((19.1, -10), (20.1, -10))
        make_face()
    revolve(axis=Axis((0, -10, 0), (0, -1, 0)), revolution_arc=F9_T55_ANGLE)

    split(bisect_by=Plane.YZ.offset(3.6), keep=Keep.TOP)


with BuildPart() as f1_10:
    add(f1_9.part)

    # F9_t52: cut F9_tool53
    add(f9_tool53.part, mode=Mode.SUBTRACT)


with BuildPart() as f9_tool58:
    # F9_s59 → F9_t60 (revolve)
    with BuildSketch(Plane(origin=(0, 0, 0), x_dir=(0, 1, 0), z_dir=(-0.4410843216, 0, 0.8974656658))):
        with BuildLine():
            ThreePointArc((-10, 20.1), (-9.7071067812, 19.3928932188), (-9, 19.1))
            Line((-9, 19.1), (-10, 19.1))
            Line((-10, 19.1), (-10, 20.1))
        make_face()
    revolve(axis=Axis((0, -10, 0), (0, -1, 0)), revolution_arc=F9_T60_ANGLE)

    split(bisect_by=Plane(origin=(-0.6125, 0, 1.0608811196), x_dir=(0, 1, 0), z_dir=(-0.5, 0, 0.8660254038)), keep=Keep.TOP)


with BuildPart() as f1_11:
    add(f1_10.part)

    # F9_t57: cut F9_tool58
    add(f9_tool58.part, mode=Mode.SUBTRACT)


with BuildPart() as f9_tool63:
    # F9_s64 → F9_t65 (revolve)
    with BuildSketch(Plane(origin=(0, 0, 0), x_dir=(0, 1, 0), z_dir=(-0.4410843216, 0, 0.8974656658))):
        with BuildLine():
            ThreePointArc((-10, 20.1), (-9.7071067812, 19.3928932188), (-9, 19.1))
            Line((-9, 19.1), (-10, 19.1))
            Line((-10, 19.1), (-10, 20.1))
        make_face()
    revolve(axis=Axis((0, -10, 0), (0, -1, 0)), revolution_arc=F9_T65_ANGLE)

    split(bisect_by=Plane(origin=(-0.6125, 0, -1.0608811196), x_dir=(0, 1, 0), z_dir=(-0.5, 0, -0.8660254038)), keep=Keep.TOP)

    split(bisect_by=Plane(origin=(0.6125, 0, -1.0608811196), x_dir=(0, 1, 0), z_dir=(0.5, 0, -0.8660254038)), keep=Keep.TOP)


with BuildPart() as f1_12:
    add(f1_11.part)

    # F9_t62: cut F9_tool63
    add(f9_tool63.part, mode=Mode.SUBTRACT)


with BuildPart() as f9_tool69:
    # F9_s70 → F9_t71 (revolve)
    with BuildSketch(Plane(origin=(0, 0, 0), x_dir=(0, 1, 0), z_dir=(-0.4410843216, 0, 0.8974656658))):
        with BuildLine():
            ThreePointArc((-10, 20.1), (-9.7071067812, 19.3928932188), (-9, 19.1))
            Line((-9, 19.1), (-10, 19.1))
            Line((-10, 19.1), (-10, 20.1))
        make_face()
    revolve(axis=Axis((0, -10, 0), (0, -1, 0)), revolution_arc=F9_T71_ANGLE)

    split(bisect_by=Plane(origin=(0.6125, 0, 1.0608811196), x_dir=(0, 1, 0), z_dir=(0.5, 0, 0.8660254038)), keep=Keep.TOP)


with BuildPart() as f1_13:
    add(f1_12.part)

    # F9_t68: cut F9_tool69
    add(f9_tool69.part, mode=Mode.SUBTRACT)

    # F9_s73 → F9_t74 (revolve, cut)
    with BuildSketch(Plane.XY):
        with BuildLine():
            ThreePointArc((19.1, 9), (19.3928932188, 9.7071067812), (20.1, 10))
            Line((20.1, 10), (19.1, 10))
            Line((19.1, 10), (19.1, 9))
        make_face()
    revolve(axis=Axis((0, 10, 0), (0, -1, 0)), mode=Mode.SUBTRACT)


with BuildPart() as f9_tool76:
    # F9_s77 → F9_t78 (revolve)
    with BuildSketch(Plane(origin=(0, 0, 0), x_dir=(0, 1, 0), z_dir=(-0.5566212024, 0, -0.8307664154))):
        with BuildLine():
            ThreePointArc((-10, 20.1), (-9.7071067812, 19.3928932188), (-9, 19.1))
            Line((-9, 19.1), (-10, 19.1))
            Line((-10, 19.1), (-10, 20.1))
        make_face()
    revolve(axis=Axis((0, -10, 0), (0, -1, 0)), revolution_arc=F9_T78_ANGLE)

    split(bisect_by=Plane(origin=(-0.6125, 0, -1.0608811196), x_dir=(0, 1, 0), z_dir=(-0.5, 0, -0.8660254038)), keep=Keep.TOP)


with BuildPart() as f1_14:
    add(f1_13.part)

    # F9_t75: cut F9_tool76
    add(f9_tool76.part, mode=Mode.SUBTRACT)


with BuildPart() as f9_tool81:
    # F9_s82 → F9_t83 (revolve)
    with BuildSketch(Plane(origin=(0, 0, 0), x_dir=(0, 1, 0), z_dir=(-0.5566212024, 0, -0.8307664154))):
        with BuildLine():
            ThreePointArc((-10, 20.1), (-9.7071067812, 19.3928932188), (-9, 19.1))
            Line((-9, 19.1), (-10, 19.1))
            Line((-10, 19.1), (-10, 20.1))
        make_face()
    revolve(axis=Axis((0, -10, 0), (0, -1, 0)), revolution_arc=F9_T83_ANGLE)

    split(bisect_by=Plane(origin=(0.6125, 0, 1.0608811196), x_dir=(0, 1, 0), z_dir=(0.5, 0, 0.8660254038)), keep=Keep.TOP)


with BuildPart() as f1_15:
    add(f1_14.part)

    # F9_t80: cut F9_tool81
    add(f9_tool81.part, mode=Mode.SUBTRACT)


solid = f1_15.part
